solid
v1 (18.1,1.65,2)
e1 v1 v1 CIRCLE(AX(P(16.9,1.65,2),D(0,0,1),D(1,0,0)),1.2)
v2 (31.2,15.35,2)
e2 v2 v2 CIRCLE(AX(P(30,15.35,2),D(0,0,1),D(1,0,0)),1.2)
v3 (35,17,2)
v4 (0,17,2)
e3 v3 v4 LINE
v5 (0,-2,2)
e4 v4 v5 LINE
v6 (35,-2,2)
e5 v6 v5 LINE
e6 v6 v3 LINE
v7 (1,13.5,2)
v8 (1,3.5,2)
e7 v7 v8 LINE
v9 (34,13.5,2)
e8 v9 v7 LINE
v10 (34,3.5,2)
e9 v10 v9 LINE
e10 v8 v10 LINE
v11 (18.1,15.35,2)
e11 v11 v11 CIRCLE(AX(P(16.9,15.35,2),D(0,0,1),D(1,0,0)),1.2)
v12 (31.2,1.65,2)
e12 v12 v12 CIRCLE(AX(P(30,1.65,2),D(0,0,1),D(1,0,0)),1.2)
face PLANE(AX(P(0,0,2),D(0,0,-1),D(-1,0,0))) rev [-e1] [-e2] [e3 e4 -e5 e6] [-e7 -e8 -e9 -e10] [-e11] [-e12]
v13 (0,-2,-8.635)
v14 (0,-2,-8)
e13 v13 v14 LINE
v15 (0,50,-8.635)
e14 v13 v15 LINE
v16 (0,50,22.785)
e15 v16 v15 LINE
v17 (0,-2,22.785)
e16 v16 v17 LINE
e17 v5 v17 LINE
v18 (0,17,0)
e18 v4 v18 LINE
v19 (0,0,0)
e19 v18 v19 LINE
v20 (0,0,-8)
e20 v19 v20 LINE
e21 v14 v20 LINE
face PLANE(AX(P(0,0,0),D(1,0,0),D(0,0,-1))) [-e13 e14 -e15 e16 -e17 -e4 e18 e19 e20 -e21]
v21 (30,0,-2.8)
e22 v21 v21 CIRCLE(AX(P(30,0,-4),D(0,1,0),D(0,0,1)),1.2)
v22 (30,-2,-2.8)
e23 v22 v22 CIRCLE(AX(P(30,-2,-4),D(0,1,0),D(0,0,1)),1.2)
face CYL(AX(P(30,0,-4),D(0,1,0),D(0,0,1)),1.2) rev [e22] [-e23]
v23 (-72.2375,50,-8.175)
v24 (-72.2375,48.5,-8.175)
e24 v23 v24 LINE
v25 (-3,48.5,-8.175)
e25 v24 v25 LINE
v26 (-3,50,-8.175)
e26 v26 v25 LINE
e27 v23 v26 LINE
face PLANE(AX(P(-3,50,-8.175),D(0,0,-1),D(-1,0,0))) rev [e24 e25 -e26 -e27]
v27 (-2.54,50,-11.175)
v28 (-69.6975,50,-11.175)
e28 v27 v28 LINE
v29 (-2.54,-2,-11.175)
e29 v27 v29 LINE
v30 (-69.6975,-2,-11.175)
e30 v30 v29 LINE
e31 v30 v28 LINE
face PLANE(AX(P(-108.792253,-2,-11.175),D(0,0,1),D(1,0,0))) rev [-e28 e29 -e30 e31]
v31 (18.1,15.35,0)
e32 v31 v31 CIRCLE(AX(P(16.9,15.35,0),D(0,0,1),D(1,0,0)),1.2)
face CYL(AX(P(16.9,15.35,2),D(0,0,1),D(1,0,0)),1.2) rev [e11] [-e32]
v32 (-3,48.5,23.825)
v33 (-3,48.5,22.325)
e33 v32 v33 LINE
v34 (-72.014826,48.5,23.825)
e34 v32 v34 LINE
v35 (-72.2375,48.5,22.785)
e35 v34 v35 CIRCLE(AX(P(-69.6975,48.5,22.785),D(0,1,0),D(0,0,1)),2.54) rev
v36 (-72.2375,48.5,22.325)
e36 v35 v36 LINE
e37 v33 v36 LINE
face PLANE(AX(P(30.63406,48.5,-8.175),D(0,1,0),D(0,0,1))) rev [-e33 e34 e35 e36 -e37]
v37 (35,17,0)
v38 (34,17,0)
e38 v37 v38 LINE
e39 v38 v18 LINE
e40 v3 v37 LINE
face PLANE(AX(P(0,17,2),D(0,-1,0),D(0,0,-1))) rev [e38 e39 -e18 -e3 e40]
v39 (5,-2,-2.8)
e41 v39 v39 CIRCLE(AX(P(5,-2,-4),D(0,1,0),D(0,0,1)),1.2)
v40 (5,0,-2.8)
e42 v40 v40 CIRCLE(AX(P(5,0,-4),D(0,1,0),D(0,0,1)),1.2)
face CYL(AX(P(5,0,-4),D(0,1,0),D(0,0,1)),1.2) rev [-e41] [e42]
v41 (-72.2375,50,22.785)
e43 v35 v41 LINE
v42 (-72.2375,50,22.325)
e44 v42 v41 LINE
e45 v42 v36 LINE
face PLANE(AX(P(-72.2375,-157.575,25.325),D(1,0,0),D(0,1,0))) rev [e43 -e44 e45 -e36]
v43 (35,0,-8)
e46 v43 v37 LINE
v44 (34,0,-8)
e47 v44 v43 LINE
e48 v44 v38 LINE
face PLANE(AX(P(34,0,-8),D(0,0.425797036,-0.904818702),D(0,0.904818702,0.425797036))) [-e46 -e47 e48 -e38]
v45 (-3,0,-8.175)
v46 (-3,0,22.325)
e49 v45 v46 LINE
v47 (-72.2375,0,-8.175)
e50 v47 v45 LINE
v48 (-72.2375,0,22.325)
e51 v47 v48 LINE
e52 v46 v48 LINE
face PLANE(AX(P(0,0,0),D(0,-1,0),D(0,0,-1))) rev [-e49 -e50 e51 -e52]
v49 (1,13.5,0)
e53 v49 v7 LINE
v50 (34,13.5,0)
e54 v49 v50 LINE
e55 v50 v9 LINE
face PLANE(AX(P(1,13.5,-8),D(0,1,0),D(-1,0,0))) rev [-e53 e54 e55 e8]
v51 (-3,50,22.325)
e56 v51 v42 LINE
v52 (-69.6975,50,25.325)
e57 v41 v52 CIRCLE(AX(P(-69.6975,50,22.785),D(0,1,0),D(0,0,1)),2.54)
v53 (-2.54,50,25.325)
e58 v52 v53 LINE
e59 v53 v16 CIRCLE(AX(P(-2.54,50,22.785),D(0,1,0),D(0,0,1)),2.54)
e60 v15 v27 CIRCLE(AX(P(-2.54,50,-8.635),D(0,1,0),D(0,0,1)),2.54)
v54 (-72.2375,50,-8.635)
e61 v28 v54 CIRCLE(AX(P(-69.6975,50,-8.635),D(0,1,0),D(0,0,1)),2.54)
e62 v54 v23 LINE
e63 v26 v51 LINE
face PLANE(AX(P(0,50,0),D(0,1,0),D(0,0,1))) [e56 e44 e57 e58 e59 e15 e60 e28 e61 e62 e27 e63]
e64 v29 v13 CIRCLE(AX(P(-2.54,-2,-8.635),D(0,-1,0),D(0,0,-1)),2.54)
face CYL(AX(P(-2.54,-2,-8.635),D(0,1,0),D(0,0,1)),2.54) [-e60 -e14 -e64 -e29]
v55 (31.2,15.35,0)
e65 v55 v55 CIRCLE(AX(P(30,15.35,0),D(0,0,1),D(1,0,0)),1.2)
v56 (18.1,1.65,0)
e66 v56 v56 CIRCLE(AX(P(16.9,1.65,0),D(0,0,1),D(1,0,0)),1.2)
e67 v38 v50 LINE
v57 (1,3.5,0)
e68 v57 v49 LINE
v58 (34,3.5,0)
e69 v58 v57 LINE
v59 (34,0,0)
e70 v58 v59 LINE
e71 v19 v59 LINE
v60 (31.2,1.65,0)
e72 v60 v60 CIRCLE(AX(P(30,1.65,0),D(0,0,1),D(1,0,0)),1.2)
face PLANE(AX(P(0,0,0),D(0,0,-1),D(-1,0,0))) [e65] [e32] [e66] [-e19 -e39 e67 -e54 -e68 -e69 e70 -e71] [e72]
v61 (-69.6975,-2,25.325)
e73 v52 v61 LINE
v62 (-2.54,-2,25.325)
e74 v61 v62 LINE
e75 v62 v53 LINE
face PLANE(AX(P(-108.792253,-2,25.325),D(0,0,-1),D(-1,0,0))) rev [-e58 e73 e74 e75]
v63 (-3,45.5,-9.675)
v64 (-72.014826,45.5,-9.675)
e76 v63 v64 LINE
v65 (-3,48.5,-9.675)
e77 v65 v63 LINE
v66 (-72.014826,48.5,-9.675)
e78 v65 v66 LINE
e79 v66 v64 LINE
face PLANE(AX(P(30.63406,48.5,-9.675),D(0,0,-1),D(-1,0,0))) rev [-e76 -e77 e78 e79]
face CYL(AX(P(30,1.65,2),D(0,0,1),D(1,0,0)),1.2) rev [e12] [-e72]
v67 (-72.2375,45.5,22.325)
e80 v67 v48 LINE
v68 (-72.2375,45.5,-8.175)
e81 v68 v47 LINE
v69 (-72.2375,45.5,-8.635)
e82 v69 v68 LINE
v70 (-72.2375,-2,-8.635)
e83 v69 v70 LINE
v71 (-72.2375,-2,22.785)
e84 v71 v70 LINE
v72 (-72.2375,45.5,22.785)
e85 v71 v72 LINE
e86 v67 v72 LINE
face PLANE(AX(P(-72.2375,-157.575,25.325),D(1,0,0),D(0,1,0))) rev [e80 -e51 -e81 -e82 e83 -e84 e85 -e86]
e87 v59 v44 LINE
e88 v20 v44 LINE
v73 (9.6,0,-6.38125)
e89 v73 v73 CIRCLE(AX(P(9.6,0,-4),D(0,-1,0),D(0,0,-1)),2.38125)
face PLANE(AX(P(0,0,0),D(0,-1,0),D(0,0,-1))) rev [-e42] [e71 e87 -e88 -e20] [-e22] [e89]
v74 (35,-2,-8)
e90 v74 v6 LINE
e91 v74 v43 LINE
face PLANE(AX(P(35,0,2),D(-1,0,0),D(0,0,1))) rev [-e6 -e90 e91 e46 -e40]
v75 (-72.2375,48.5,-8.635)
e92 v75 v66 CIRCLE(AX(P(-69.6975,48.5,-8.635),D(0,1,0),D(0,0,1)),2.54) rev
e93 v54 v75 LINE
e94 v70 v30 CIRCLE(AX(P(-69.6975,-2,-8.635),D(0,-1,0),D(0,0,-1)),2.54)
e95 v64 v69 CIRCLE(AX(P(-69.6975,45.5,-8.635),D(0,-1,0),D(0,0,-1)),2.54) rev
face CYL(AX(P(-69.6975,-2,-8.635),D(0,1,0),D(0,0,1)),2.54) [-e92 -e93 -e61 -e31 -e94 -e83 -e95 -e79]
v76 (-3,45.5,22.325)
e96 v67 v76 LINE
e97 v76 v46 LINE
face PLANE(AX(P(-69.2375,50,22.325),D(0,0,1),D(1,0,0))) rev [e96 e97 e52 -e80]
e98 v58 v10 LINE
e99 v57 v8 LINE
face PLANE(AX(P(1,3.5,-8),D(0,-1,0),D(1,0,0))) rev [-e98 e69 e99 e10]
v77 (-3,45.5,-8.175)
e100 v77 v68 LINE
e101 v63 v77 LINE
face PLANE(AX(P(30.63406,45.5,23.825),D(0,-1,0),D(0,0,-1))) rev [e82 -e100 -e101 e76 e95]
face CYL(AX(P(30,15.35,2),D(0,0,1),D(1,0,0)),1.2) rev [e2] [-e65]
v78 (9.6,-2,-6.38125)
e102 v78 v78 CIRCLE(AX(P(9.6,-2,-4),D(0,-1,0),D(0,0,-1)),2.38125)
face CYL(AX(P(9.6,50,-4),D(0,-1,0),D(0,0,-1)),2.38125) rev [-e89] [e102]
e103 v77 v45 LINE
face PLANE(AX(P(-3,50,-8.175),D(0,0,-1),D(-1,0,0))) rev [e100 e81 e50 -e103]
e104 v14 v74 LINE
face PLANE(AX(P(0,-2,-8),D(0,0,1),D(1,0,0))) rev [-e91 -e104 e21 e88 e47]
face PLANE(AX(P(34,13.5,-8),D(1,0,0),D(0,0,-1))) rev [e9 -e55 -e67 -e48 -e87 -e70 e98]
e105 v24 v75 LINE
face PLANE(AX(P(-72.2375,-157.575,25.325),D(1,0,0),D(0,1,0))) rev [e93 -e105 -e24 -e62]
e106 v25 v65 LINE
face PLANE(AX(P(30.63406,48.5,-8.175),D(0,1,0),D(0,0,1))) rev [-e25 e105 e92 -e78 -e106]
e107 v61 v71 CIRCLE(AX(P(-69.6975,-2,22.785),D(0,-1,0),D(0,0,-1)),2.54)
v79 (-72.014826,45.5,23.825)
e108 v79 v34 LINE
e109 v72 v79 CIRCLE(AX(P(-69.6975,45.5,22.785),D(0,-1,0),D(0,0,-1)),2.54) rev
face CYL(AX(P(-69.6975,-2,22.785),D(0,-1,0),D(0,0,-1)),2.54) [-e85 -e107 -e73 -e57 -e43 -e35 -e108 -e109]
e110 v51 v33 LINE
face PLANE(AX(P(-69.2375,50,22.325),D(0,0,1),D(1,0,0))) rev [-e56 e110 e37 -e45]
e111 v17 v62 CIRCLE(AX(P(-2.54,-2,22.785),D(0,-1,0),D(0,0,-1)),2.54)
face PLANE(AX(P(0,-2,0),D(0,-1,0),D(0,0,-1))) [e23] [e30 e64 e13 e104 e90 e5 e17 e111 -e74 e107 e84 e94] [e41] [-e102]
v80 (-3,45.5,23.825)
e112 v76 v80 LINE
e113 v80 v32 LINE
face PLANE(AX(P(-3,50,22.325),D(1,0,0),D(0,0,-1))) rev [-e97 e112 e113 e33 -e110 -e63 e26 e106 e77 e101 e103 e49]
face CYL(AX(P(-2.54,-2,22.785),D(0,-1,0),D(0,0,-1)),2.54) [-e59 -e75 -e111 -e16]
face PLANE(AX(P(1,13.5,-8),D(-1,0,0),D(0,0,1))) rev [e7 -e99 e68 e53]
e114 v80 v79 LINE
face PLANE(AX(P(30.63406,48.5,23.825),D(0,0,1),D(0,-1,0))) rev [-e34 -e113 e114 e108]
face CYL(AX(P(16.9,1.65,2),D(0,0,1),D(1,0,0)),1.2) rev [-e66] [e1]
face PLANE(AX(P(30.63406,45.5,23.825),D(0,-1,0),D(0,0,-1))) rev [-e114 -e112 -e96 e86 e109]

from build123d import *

# Parameters (mm, degrees)
SKETCH1_W            = 35
SKETCH1_H            = 17
BOSS_EXTRUDE1_DEPTH  = 2
M2_CLEARANCE_HOLE1_D = 2.4
SKETCH6_W            = 35
SKETCH6_H            = 10
BOSS_EXTRUDE2_DEPTH  = 2
SKETCH7_W            = 33
SKETCH7_H            = 10
CUT_EXTRUDE1_DEPTH   = 41.174618853
M2_CLEARANCE_HOLE2_D = 2.4
SKETCH10_W           = 36.5
SKETCH10_H           = 2
BOSS_EXTRUDE3_DEPTH  = 72.237500028
BOSS_EXTRUDE4_DEPTH  = 50
CUT_EXTRUDE2_DEPTH   = 69.237500028
BOSS_EXTRUDE5_DEPTH  = 1
FILLET1_R            = 2.54
SKETCH15_R           = 2.38125
CUT_EXTRUDE3_DEPTH   = 93.539786229


with BuildPart() as part:
    # Sketch1 → Boss-Extrude1 (new body)
    with BuildSketch(Plane.XY):
        with Locations((17.5, 8.5)):
            Rectangle(SKETCH1_W, SKETCH1_H)
    extrude(amount=BOSS_EXTRUDE1_DEPTH)

    # M2 Clearance Hole1 (through all)
    with Locations(Plane.XY.offset(2)):
        with Locations((16.9, 15.35), (30, 15.35), (30, 1.65), (16.9, 1.65)):
            Hole(M2_CLEARANCE_HOLE1_D / 2)

    # Sketch6 → Boss-Extrude2 (add)
    with BuildSketch(Plane.XZ):
        with Locations((17.5, -3)):
            Rectangle(SKETCH6_W, SKETCH6_H)
    extrude(amount=BOSS_EXTRUDE2_DEPTH)

    # Sketch7 → Cut-Extrude1 (cut, through all)
    with BuildSketch(Plane.XY.offset(2)):
        with Locations((17.5, 8.5)):
            Rectangle(SKETCH7_W, SKETCH7_H)
    extrude(amount=-CUT_EXTRUDE1_DEPTH, mode=Mode.SUBTRACT)

    # M2 Clearance Hole2 (through all)
    with Locations(Plane(origin=(0, 0, 0), x_dir=(1, 0, 0), z_dir=(0, 1, 0))):
        with Locations((30, 4), (5, 4)):
            Hole(M2_CLEARANCE_HOLE2_D / 2)

    # Sketch10 → Boss-Extrude3 (add)
    with BuildSketch(Plane.ZY):
        with Locations((7.075, -1)):
            Rectangle(SKETCH10_W, SKETCH10_H)
    extrude(amount=BOSS_EXTRUDE3_DEPTH)

    # Sketch11 → Boss-Extrude4 (add)
    with BuildSketch(Plane(origin=(0, 0, 0), x_dir=(1, 0, 0), z_dir=(0, 1, 0))):
        Polygon((0, -25.325), (-72.237500028, -25.325), (-72.237500028, -22.325), (-69.237500028, -22.325), (-3, -22.325), (-3, 8.175), (-69.237500028, 8.175), (-72.237500028, 8.175), (-72.237500028, 11.175), (0, 11.175), align=None)
    extrude(amount=BOSS_EXTRUDE4_DEPTH)

    # Sketch12 → Cut-Extrude2 (cut)
    with BuildSketch(Plane.ZY.offset(72.237500028)):
        Polygon((23.825, 48.5), (22.325, 48.5), (-8.175, 48.5), (-9.675, 48.5), (-9.675, 45.5), (-8.175, 45.5), (22.325, 45.5), (23.825, 45.5), align=None)
    extrude(amount=-CUT_EXTRUDE2_DEPTH, mode=Mode.SUBTRACT)

    # Sketch14 → Boss-Extrude5 (add)
    with BuildSketch(Plane(origin=(35, 0, 0), x_dir=(0, 0, -1), z_dir=(1, 0, 0))):
        Polygon((8, 0), (0, 17), (0, 0), align=None)
    extrude(amount=-BOSS_EXTRUDE5_DEPTH)

    # Fillet1
    # the kernel refuses this fillet: 2.54 mm, written as the material it takes off along each edge
    with BuildSketch(Plane(origin=(0, 56.35, 25.325), x_dir=(0, 0, -1), z_dir=(0, -1, 0)), Plane(origin=(-72.237500028, 56.35, 25.325), x_dir=(1, 0, 0), z_dir=(0, -1, 0)), Plane(origin=(-72.237500028, -8.35, -11.175), x_dir=(1, 0, 0), z_dir=(0, 1, 0)), Plane(origin=(0, -8.35, -11.175), x_dir=(0, 0, 1), z_dir=(0, 1, 0))) as fillet1_piece_1:
        with BuildLine():
            CenterArc((FILLET1_R, -FILLET1_R), FILLET1_R, 90, 90)
            Line((0, -FILLET1_R), (0, 0))
            Line((0, 0), (FILLET1_R, 0))
        make_face()
    extrude(amount=64.7, mode=Mode.SUBTRACT)

    # Sketch15 → Cut-Extrude3 (cut, through all)
    with BuildSketch(Plane.XZ.offset(2)):
        with Locations(Location((9.6, -4, 0), (0, 0, 270))):
            Circle(SKETCH15_R)
    extrude(amount=-CUT_EXTRUDE3_DEPTH, mode=Mode.SUBTRACT)


solid = part.part
